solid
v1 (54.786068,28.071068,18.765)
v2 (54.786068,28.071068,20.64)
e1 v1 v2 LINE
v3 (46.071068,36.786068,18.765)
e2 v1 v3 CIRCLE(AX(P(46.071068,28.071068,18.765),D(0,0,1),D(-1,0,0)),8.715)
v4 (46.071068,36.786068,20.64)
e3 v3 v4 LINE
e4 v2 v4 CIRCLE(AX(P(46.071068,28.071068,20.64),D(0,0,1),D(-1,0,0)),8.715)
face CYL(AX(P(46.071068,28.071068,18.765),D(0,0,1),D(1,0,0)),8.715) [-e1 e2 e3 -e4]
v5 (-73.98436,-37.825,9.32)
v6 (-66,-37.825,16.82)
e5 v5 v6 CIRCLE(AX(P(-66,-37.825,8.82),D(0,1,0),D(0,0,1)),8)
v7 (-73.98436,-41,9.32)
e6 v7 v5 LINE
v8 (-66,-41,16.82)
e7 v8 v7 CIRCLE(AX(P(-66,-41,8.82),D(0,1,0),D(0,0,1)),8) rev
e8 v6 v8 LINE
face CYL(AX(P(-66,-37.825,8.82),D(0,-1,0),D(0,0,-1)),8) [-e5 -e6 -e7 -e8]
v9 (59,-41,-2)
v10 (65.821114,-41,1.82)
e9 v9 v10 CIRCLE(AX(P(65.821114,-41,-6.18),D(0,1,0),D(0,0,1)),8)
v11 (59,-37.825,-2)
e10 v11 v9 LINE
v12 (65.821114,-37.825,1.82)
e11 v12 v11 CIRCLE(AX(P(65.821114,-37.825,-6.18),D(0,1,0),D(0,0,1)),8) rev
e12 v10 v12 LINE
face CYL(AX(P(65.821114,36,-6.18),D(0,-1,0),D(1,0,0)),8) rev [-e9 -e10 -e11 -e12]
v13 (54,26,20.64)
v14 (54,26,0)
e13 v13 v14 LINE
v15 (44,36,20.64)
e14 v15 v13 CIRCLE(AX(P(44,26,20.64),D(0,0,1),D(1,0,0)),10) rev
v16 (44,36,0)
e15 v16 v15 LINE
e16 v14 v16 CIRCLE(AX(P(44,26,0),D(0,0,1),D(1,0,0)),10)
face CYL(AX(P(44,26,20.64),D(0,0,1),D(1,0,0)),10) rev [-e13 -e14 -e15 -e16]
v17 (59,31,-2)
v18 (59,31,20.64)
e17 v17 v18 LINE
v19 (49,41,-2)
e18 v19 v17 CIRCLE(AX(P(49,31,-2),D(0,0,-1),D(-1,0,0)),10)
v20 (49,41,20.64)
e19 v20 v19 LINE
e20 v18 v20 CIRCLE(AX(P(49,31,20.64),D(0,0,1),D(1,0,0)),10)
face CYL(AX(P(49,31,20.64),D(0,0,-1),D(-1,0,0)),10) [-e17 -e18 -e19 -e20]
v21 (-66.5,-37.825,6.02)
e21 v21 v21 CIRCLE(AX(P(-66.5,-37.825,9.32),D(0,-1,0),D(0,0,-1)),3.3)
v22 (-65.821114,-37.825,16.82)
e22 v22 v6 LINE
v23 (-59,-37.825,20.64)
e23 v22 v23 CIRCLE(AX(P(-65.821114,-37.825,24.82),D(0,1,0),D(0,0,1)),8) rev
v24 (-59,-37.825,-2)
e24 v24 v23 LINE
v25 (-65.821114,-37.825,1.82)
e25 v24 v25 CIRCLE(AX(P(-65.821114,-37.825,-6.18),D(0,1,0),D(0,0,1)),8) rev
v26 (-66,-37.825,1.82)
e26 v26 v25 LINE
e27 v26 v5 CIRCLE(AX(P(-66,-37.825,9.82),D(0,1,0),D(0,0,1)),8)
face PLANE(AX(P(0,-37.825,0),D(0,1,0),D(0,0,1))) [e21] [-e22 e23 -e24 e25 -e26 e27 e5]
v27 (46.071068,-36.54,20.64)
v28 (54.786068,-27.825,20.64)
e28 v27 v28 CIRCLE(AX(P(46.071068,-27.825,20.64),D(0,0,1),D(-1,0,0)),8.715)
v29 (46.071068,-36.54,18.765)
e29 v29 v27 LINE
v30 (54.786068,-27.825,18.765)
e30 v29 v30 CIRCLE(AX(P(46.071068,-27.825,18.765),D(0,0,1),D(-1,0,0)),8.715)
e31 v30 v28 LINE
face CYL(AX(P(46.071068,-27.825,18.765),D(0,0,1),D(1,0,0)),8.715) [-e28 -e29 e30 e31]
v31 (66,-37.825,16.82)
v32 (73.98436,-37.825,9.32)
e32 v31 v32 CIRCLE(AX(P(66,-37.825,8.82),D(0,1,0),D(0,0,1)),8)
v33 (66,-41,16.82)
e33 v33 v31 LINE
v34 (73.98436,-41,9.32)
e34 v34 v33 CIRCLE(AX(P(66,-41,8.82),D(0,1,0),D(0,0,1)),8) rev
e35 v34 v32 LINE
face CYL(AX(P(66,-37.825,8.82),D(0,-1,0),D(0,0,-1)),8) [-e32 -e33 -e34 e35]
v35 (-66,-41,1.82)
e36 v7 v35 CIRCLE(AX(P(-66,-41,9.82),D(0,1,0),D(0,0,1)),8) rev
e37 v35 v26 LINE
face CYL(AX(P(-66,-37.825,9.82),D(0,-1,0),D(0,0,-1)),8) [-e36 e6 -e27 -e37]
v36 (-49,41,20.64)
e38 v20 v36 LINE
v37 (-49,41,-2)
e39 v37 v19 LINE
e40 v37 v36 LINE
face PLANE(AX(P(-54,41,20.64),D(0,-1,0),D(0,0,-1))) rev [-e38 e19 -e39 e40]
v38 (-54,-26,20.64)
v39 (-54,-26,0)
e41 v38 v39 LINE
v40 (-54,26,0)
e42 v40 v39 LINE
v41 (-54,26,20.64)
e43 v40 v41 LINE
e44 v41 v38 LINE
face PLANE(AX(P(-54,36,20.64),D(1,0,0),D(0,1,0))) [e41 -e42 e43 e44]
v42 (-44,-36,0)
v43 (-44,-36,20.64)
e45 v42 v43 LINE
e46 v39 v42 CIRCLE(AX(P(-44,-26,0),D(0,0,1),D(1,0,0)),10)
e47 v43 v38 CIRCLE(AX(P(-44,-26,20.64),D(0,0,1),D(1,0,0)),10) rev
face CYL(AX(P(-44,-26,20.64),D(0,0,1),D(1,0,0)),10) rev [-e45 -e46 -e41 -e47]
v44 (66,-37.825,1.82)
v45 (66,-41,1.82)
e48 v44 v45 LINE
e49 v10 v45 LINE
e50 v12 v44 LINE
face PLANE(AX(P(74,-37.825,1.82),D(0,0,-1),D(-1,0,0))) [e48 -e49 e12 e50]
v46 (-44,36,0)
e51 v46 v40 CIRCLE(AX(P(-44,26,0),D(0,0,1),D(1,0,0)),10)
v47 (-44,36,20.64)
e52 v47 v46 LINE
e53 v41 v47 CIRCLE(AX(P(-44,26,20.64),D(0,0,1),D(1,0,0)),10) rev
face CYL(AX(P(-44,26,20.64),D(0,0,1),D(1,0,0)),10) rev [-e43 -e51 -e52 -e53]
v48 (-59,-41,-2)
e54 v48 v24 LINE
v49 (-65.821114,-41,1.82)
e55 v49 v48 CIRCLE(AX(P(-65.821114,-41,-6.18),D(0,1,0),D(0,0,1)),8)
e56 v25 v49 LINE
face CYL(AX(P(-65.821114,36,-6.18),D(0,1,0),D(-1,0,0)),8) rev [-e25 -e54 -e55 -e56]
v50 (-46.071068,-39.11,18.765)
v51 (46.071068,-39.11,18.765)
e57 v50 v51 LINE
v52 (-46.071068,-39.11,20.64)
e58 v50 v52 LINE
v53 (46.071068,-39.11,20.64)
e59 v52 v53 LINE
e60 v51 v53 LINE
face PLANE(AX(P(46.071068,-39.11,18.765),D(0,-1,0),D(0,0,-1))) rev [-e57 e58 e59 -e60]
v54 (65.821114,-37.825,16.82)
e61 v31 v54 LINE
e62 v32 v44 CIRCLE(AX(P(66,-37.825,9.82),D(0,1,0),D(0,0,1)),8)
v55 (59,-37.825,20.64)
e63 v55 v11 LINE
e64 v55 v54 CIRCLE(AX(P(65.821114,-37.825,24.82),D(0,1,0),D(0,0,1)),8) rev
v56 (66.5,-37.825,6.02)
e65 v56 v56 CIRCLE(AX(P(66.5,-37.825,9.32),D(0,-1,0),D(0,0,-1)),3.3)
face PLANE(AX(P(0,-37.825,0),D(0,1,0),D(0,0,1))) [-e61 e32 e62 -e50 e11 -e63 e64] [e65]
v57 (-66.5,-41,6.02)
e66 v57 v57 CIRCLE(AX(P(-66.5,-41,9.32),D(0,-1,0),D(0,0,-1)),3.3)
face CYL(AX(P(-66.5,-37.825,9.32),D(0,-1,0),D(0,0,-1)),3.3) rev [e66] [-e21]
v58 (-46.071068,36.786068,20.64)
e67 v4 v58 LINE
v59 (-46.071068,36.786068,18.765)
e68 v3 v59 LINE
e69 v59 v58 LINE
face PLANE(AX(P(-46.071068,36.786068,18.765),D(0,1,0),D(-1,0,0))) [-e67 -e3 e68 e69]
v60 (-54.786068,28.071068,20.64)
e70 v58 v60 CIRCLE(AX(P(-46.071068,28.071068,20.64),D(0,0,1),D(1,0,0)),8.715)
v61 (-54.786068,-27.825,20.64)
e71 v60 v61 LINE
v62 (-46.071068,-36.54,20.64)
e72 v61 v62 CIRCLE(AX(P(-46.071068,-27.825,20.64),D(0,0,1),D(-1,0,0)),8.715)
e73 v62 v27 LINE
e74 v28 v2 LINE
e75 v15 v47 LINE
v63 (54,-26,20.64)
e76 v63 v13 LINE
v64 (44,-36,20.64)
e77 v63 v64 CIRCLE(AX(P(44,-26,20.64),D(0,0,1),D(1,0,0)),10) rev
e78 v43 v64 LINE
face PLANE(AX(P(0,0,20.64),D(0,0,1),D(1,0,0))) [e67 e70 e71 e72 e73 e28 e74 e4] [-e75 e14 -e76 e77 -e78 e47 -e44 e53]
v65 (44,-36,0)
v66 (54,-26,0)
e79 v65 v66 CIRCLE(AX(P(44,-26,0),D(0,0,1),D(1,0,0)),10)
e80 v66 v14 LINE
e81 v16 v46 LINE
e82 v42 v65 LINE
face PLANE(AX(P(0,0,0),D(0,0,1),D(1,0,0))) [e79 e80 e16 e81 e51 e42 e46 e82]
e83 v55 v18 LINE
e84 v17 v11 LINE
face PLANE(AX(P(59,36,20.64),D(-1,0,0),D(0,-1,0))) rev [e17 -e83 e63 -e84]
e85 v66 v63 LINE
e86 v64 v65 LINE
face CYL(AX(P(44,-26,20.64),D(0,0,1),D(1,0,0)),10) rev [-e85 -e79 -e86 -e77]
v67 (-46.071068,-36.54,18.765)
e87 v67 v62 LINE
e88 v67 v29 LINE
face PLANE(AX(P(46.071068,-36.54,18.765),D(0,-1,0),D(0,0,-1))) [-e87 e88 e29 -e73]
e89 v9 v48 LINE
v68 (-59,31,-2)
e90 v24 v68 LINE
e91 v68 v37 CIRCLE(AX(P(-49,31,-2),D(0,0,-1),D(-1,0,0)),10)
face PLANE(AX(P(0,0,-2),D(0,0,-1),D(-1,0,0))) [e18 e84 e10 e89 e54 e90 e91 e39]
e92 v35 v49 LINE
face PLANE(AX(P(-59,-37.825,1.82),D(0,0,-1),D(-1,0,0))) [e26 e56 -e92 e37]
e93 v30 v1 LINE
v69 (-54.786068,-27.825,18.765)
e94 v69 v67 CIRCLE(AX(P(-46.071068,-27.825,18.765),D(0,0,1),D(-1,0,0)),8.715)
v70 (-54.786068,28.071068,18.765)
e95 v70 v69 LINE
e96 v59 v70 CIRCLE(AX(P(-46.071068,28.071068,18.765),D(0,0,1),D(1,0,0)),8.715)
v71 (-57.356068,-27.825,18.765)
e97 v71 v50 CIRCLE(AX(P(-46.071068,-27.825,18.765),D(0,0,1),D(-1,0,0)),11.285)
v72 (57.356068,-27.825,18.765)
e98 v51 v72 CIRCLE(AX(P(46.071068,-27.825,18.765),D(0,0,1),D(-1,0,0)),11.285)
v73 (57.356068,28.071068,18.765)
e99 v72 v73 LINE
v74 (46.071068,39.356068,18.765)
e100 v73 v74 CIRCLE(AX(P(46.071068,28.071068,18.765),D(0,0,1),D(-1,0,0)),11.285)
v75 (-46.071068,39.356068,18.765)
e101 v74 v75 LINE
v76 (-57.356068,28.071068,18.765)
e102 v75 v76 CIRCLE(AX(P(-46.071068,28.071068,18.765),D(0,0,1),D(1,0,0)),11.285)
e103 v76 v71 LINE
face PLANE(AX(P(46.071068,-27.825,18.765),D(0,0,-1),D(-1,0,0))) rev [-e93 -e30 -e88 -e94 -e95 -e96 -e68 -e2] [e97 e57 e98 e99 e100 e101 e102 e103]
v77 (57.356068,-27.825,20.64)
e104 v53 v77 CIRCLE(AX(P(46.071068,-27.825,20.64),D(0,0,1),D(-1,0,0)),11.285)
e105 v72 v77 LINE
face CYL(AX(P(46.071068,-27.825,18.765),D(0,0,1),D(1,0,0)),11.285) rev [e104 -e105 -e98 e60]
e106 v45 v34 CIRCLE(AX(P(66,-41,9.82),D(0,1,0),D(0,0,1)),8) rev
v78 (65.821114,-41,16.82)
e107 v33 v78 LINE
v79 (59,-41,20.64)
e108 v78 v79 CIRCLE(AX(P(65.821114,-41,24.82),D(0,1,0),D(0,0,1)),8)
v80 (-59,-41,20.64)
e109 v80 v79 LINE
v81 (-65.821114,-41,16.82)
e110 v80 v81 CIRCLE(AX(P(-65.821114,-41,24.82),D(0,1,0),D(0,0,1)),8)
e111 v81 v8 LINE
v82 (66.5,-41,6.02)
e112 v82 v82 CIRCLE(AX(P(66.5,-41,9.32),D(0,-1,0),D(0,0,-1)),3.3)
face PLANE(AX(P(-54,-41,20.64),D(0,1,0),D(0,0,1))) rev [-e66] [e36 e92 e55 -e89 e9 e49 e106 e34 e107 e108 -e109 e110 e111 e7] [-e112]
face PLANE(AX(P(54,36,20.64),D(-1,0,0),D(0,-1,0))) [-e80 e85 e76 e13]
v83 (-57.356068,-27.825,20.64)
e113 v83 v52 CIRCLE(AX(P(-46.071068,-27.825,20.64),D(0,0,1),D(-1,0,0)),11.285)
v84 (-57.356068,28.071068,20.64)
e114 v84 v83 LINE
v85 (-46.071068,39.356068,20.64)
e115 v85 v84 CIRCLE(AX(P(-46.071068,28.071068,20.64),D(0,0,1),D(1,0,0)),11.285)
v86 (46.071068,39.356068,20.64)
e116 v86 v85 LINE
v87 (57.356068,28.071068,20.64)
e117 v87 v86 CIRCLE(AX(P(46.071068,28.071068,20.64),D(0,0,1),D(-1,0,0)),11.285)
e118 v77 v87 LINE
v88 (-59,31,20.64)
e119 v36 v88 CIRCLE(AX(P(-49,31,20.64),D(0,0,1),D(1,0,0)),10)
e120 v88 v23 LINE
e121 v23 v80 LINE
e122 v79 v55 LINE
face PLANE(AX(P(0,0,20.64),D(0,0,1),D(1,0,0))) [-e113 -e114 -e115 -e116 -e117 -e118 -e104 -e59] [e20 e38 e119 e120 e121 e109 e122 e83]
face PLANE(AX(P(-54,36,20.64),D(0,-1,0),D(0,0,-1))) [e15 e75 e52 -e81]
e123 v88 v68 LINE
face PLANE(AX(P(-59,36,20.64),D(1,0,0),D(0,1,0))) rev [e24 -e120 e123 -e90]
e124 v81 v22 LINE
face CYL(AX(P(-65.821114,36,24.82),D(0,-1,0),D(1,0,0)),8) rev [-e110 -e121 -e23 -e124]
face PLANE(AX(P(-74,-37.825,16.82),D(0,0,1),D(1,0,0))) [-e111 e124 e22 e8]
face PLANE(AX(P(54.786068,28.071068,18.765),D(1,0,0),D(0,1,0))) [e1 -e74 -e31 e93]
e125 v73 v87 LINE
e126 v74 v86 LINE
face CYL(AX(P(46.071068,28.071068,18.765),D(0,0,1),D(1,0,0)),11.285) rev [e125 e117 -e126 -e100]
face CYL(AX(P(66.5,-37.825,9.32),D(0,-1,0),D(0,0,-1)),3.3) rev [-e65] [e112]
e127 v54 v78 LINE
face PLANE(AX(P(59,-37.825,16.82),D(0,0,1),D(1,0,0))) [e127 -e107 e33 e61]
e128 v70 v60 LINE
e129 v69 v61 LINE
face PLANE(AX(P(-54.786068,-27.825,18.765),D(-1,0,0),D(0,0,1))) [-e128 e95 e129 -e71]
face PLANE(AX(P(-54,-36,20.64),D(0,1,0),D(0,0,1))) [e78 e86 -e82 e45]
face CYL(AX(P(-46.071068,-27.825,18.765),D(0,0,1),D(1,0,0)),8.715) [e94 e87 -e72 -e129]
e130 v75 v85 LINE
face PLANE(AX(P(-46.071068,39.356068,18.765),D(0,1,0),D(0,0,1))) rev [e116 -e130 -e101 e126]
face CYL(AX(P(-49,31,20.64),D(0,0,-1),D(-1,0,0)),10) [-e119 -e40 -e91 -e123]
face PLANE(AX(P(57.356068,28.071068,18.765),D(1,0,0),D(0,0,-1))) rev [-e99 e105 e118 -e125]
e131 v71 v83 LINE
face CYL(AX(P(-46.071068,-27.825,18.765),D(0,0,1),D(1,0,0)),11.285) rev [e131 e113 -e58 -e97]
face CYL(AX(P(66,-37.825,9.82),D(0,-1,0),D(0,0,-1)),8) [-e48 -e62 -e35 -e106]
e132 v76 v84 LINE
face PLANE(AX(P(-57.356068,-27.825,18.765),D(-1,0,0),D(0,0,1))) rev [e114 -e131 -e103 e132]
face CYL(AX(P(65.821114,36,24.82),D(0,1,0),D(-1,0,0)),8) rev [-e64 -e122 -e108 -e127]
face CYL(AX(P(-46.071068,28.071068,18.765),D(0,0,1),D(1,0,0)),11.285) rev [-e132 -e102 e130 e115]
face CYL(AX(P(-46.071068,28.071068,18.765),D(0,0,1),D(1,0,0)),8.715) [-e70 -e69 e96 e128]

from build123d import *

# Parameters (mm, degrees)
SKETCH2_W           = 108
SKETCH2_H           = 72
BOSS_EXTRUDE1_DEPTH = 20.64
SHELL1_T            = 5
SKETCH3_W           = 118
SKETCH3_H           = 82
CUT_EXTRUDE1_DEPTH  = 3
SKETCH4_W           = 15
SKETCH4_H           = 15
SKETCH4_R           = 3.3
BOSS_EXTRUDE2_DEPTH = 3.175
FILLET1_R           = 10
FILLET2_R           = 8
CUT_EXTRUDE2_DEPTH  = 1.875


with BuildPart() as part:
    # Sketch2 → Boss-Extrude1 (new body)
    with BuildSketch(Plane.XY):
        Rectangle(SKETCH2_W, SKETCH2_H)
    extrude(amount=BOSS_EXTRUDE1_DEPTH)

    # Shell1
    shell1_openings = [part.faces().sort_by_distance(p)[0] for p in [
        (0, 0, 20.64),
    ]]
    offset(amount=SHELL1_T, openings=shell1_openings, kind=Kind.INTERSECTION)

    # Sketch3 → Cut-Extrude1 (cut)
    with BuildSketch(Plane(origin=(0, 0, -5), x_dir=(-1, 0, 0), z_dir=(0, 0, -1))):
        Rectangle(SKETCH3_W, SKETCH3_H)
    extrude(amount=-CUT_EXTRUDE1_DEPTH, mode=Mode.SUBTRACT)

    # Sketch4 → Boss-Extrude2 (add)
    # profile 1 of 2: a face of its own
    with BuildSketch(Plane.XZ.offset(41)):
        with Locations((-66.5, 9.32)):
            Rectangle(SKETCH4_W, SKETCH4_H)
        with Locations(Location((-66.5, 9.32, 0), (0, 0, 270))):
            Circle(SKETCH4_R, mode=Mode.SUBTRACT)
    # profile 2 of 2: a face of its own
    with BuildSketch(Plane.XZ.offset(41)):
        with Locations((66.5, 9.32)):
            Rectangle(SKETCH4_W, SKETCH4_H)
        with Locations(Location((66.5, 9.32, 0), (0, 0, 270))):
            Circle(SKETCH4_R, mode=Mode.SUBTRACT)
    extrude(amount=-BOSS_EXTRUDE2_DEPTH)

    # Fillet1
    fillet1_edges = [part.edges().sort_by_distance(p)[0] for p in [
        (54, -36, 10.32),
        (54, 36, 10.32),
        (-54, 36, 10.32),
        (-54, -36, 10.32),
        (-59, 41, 9.32),
        (59, 41, 9.32),
    ]]
    fillet(fillet1_edges, radius=FILLET1_R)

    # Fillet2
    # the kernel refuses this fillet: 8 mm, written as the material it adds along each edge
    with BuildSketch(Plane(origin=(59, -41, 16.82), x_dir=(0, 0, 1), z_dir=(0, 1, 0)), Plane(origin=(-59, -41, 1.82), x_dir=(0, 0, -1), z_dir=(0, 1, 0))) as fillet2_piece_1:
        with BuildLine():
            CenterArc((8, 6.821114278), FILLET2_R, 180, 58.499903552)
            Line((0, 6.821114278), (0, 0))
            Line((0, 0), (3.82, 0))
        make_face()
    extrude(amount=3.175)
    with BuildSketch(Plane(origin=(59, -41, 1.82), x_dir=(0, 0, -1), z_dir=(0, 1, 0)), Plane(origin=(-59, -41, 16.82), x_dir=(0, 0, 1), z_dir=(0, 1, 0))) as fillet2_piece_2:
        with BuildLine():
            CenterArc((8, -6.821114278), FILLET2_R, 121.500096448, 58.499903552)
            Line((0, -6.821114278), (0, 0))
            Line((0, 0), (3.82, 0))
        make_face()
    extrude(amount=3.175)
    # the kernel refuses this fillet: 8 mm, written as the material it takes off along each edge
    with BuildSketch(Plane(origin=(74, -61, 16.82), x_dir=(0, 0, -1), z_dir=(0, 1, 0)), Plane(origin=(-74, -61, 1.82), x_dir=(0, 0, 1), z_dir=(0, 1, 0)), Plane(origin=(-74, -61, 16.82), x_dir=(1, 0, 0), z_dir=(0, 1, 0))) as fillet2_2_piece_1:
        with BuildLine():
            CenterArc((FILLET2_R, FILLET2_R), FILLET2_R, 180, 90)
            Line((0, FILLET2_R), (0, 0))
            Line((0, 0), (FILLET2_R, 0))
        make_face()
    extrude(amount=43.175, mode=Mode.SUBTRACT)
    with BuildSketch(Plane(origin=(74, -61, 1.82), x_dir=(0, 0, 1), z_dir=(0, 1, 0))) as fillet2_2_piece_2:
        with BuildLine():
            CenterArc((FILLET2_R, -FILLET2_R), FILLET2_R, 90, 90)
            Line((0, -FILLET2_R), (0, 0))
            Line((0, 0), (FILLET2_R, 0))
        make_face()
    extrude(amount=43.175, mode=Mode.SUBTRACT)

    # Sketch5 → Cut-Extrude2 (cut)
    with BuildSketch(Plane.XY.offset(20.64)):
        with BuildLine():
            Line((46.071067812, -39.11), (-46.071067812, -39.11))
            ThreePointArc((-46.071067812, -39.11), (-54.050767838, -35.804700026), (-57.356067812, -27.825))
            Line((-57.356067812, -27.825), (-57.356067812, 28.071067812))
            ThreePointArc((-57.356067812, 28.071067812), (-54.050767838, 36.050767838), (-46.071067812, 39.356067812))
            Line((-46.071067812, 39.356067812), (46.071067812, 39.356067812))
            ThreePointArc((46.071067812, 39.356067812), (54.050767838, 36.050767838), (57.356067812, 28.071067812))
            Line((57.356067812, 28.071067812), (57.356067812, -27.825))
            ThreePointArc((57.356067812, -27.825), (54.050767838, -35.804700026), (46.071067812, -39.11))
        make_face()
        with BuildLine():
            Line((46.071067812, -36.54), (-46.071067812, -36.54))
            ThreePointArc((-46.071067812, -36.54), (-52.23350341, -33.987435598), (-54.786067812, -27.825))
            Line((-54.786067812, -27.825), (-54.786067812, 28.071067812))
            ThreePointArc((-54.786067812, 28.071067812), (-52.23350341, 34.23350341), (-46.071067812, 36.786067812))
            Line((-46.071067812, 36.786067812), (46.071067812, 36.786067812))
            ThreePointArc((46.071067812, 36.786067812), (52.23350341, 34.23350341), (54.786067812, 28.071067812))
            Line((54.786067812, 28.071067812), (54.786067812, -27.825))
            ThreePointArc((54.786067812, -27.825), (52.23350341, -33.987435598), (46.071067812, -36.54))
        make_face(mode=Mode.SUBTRACT)
    extrude(amount=-CUT_EXTRUDE2_DEPTH, mode=Mode.SUBTRACT)


solid = part.part
